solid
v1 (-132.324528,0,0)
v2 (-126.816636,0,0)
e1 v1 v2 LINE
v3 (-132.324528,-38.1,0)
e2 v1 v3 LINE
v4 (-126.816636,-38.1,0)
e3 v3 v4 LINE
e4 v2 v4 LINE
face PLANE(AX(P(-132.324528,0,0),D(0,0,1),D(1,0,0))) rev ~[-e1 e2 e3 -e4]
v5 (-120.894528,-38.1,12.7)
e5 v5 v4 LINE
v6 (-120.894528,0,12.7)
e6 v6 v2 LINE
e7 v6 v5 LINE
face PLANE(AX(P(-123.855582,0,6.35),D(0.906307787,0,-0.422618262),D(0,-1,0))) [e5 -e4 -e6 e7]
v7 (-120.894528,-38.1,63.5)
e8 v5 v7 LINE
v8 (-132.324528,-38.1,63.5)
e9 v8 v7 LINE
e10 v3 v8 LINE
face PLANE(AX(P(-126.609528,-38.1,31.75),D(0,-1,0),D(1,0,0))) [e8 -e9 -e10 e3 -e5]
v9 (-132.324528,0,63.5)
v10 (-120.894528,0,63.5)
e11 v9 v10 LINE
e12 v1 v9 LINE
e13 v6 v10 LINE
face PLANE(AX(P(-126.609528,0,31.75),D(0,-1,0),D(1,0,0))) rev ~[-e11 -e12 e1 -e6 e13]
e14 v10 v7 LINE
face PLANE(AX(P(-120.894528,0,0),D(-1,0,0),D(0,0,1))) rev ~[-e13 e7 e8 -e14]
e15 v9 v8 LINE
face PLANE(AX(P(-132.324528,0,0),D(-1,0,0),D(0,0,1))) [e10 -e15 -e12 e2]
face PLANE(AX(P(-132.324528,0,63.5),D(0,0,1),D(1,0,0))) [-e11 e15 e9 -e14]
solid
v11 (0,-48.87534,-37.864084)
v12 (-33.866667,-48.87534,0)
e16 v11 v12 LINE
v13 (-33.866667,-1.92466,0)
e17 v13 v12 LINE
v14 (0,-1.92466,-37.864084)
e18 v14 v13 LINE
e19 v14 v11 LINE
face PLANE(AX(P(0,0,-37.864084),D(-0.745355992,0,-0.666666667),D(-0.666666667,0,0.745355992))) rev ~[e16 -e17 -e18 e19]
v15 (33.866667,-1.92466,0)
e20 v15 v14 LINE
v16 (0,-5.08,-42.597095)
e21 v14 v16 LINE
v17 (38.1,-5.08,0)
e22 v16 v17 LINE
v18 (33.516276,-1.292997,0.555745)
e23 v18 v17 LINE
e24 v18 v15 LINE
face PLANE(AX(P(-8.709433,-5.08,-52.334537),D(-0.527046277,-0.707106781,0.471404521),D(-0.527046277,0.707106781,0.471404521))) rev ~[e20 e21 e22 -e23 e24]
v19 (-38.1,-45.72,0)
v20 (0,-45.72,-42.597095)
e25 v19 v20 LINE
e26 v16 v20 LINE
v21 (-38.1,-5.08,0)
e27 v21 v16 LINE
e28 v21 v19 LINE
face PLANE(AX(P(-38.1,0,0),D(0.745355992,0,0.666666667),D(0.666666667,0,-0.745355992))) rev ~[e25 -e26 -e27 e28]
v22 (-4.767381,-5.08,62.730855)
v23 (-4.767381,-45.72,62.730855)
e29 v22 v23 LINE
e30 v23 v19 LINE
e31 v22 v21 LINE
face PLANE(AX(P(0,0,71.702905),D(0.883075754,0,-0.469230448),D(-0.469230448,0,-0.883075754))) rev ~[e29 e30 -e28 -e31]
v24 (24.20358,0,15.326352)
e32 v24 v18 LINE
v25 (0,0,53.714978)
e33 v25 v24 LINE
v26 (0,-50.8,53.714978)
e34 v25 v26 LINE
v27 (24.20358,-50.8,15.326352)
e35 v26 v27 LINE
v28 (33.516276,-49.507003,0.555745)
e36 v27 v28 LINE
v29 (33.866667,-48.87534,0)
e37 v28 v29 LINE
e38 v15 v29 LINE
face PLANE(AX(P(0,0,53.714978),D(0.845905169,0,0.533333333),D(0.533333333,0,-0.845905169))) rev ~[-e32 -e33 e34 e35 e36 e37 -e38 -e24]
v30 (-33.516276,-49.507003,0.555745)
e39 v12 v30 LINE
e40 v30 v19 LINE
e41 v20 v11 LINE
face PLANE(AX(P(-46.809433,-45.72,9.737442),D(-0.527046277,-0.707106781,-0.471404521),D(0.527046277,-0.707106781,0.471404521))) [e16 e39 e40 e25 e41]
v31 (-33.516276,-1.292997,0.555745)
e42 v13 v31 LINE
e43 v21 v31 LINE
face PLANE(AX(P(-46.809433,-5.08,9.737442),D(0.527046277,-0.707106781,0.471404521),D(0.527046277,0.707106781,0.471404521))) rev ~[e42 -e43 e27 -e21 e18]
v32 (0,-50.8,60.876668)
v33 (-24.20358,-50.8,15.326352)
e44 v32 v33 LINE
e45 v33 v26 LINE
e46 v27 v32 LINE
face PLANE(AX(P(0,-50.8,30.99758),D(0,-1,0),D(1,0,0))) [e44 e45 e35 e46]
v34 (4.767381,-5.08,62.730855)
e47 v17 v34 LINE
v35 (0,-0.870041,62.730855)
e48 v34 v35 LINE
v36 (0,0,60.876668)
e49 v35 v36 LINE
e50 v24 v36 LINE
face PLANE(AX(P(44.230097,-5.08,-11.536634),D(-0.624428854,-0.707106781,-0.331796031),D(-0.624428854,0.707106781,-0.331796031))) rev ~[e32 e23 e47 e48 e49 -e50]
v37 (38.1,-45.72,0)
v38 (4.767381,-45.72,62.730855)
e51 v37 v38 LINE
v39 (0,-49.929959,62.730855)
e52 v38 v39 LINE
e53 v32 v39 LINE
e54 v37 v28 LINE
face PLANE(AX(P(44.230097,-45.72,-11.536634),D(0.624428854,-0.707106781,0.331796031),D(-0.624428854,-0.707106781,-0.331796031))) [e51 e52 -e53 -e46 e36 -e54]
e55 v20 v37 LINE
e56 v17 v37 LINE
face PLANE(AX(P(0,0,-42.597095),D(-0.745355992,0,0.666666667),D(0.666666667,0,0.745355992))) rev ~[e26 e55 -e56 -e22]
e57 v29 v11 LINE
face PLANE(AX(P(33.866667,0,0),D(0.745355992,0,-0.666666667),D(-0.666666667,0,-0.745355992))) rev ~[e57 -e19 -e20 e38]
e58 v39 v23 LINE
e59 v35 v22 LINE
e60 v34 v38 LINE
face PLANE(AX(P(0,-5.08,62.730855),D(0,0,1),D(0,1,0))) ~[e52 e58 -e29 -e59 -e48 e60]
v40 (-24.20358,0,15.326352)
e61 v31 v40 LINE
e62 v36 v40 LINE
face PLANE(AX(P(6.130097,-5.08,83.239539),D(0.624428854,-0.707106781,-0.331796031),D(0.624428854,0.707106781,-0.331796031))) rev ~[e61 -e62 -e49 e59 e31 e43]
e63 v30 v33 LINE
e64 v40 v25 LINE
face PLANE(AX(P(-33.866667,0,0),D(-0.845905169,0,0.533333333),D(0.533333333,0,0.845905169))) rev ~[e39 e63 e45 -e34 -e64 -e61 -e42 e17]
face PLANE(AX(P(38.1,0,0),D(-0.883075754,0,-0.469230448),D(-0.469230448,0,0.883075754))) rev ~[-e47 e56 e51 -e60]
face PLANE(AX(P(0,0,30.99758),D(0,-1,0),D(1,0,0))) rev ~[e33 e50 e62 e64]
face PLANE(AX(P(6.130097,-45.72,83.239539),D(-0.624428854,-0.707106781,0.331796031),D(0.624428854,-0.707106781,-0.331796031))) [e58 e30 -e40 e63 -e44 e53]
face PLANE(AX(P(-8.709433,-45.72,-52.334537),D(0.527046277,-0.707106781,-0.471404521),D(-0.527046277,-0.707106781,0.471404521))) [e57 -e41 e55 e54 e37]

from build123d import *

# Parameters (mm, degrees)
F1_DEPTH    = 50.8
F2_T1_DEPTH = 83.2782991577
F2_T3_DEPTH = 83.2782991577
F2_T5_DEPTH = 107.325076123
F2_T7_DEPTH = 107.325076123
F3_SIZE     = 10.16
F4_W        = 11.43
F4_H        = 63.5
F5_DEPTH    = 38.1
F6_SIZE2    = 5.9221072586
F6_SIZE     = 12.7
F7_W        = 11.43
F7_H        = 63.5
F8_DEPTH    = 50.8
F9_SIZE2    = 13.9571852908
F9_SIZE     = 5.08


# Not quite as in the source:
# - a fillet or chamfer that OpenCascade refuses, or shapes differently, is made with other operations: its cross-section is extruded or revolved along the edge and cut away or added


with BuildPart() as f1:
    # F0 (on Front) → F1 (new body)
    with BuildSketch(Plane.XZ):
        Polygon((38.1, 0), (0, 71.7029050286), (-38.1, 0), (-33.8666666667, 0), (0, 53.7149782546), (33.8666666667, 0), align=None)
        Polygon((0, -42.5970949714), (38.1, 0), (33.8666666667, 0), (0, -37.864084419), (-33.8666666667, 0), (-38.1, 0), align=None)
    extrude(amount=F1_DEPTH)

    # F2: chamfer of 5.08 on 8 edges, made by hand

    # F2_s2 → F2_t1 (cut)
    with BuildSketch(Plane(origin=(-25.6427663859, 0, 28.669484385), x_dir=(0, 1, 0), z_dir=(0.6666666667, 0, -0.7453559925))):
        Polygon((-45.72, -28.3980633142), (-50.8, -23.3180633142), (-50.8, -28.3980633142), align=None)
        Polygon((-5.08, -28.3980633142), (0, -23.3180633142), (0, -28.3980633142), align=None)
    extrude(amount=F2_T1_DEPTH, mode=Mode.SUBTRACT)

    # F2_s4 → F2_t3 (cut)
    with BuildSketch(Plane(origin=(-29.8760997192, 0, -33.4024949374), x_dir=(0, 1, 0), z_dir=(0.6666666667, 0, 0.7453559925))):
        Polygon((-45.72, -28.3980633142), (-50.8, -23.3180633142), (-50.8, -28.3980633142), align=None)
        Polygon((-5.08, -28.3980633142), (0, -23.3180633142), (0, -28.3980633142), align=None)
    extrude(amount=F2_T3_DEPTH, mode=Mode.SUBTRACT)

    # F2_s6 → F2_t5 (cut)
    with BuildSketch(Plane(origin=(35.8413449406, 0, 67.4521929756), x_dir=(0, 1, 0), z_dir=(-0.4692304476, 0, -0.8830757538))):
        Polygon((-45.72, -33.6451862216), (-50.8, -28.5651862216), (-50.8, -33.6451862216), align=None)
        Polygon((-5.08, -33.6451862216), (0, -28.5651862216), (0, -33.6451862216), align=None)
    extrude(amount=F2_T5_DEPTH, mode=Mode.SUBTRACT)

    # F2_s8 → F2_t7 (cut)
    with BuildSketch(Plane(origin=(14.5188485685, 0, -27.3239795285), x_dir=(0, 1, 0), z_dir=(-0.4692304476, 0, 0.8830757538))):
        Polygon((-45.72, -33.6451862216), (-50.8, -28.5651862216), (-50.8, -33.6451862216), align=None)
        Polygon((-5.08, -33.6451862216), (0, -28.5651862216), (0, -33.6451862216), align=None)
    extrude(amount=F2_T7_DEPTH, mode=Mode.SUBTRACT)

    # F3
    f3_edges = [f1.edges().sort_by_distance(p)[0] for p in [
        (0, -25.4, 71.702905),
    ]]
    chamfer(f3_edges, length=F3_SIZE)


with BuildPart() as f5:
    # F4 (on Front) → F5 (new body)
    with BuildSketch(Plane.XZ):
        with Locations((-126.6095284371, 31.75)):
            Rectangle(F4_W, F4_H)
    extrude(amount=F5_DEPTH)

    # F6
    f6_edges = [f5.edges().sort_by_distance(p)[0] for p in [
        (-120.894528, -19.05, 0),
    ]]
    f6_side = f5.faces().sort_by_distance((-120.894528, -19.05, 31.75))[0]
    chamfer(f6_edges, length=F6_SIZE, length2=F6_SIZE2, reference=f6_side)


with BuildPart() as f8:
    # F7 (on Front) → F8 (new body)
    with BuildSketch(Plane.XZ):
        with Locations((127.6592557868, 31.75)):
            Rectangle(F7_W, F7_H)
    extrude(amount=F8_DEPTH)

    # F9
    f9_edges = [f8.edges().sort_by_distance(p)[0] for p in [
        (121.944256, -25.4, 0),
    ]]
    f9_side = f8.faces().sort_by_distance((127.659256, -25.4, 0))[0]
    chamfer(f9_edges, length=F9_SIZE, length2=F9_SIZE2, reference=f9_side)


solid = Compound([f1.part, f5.part])
